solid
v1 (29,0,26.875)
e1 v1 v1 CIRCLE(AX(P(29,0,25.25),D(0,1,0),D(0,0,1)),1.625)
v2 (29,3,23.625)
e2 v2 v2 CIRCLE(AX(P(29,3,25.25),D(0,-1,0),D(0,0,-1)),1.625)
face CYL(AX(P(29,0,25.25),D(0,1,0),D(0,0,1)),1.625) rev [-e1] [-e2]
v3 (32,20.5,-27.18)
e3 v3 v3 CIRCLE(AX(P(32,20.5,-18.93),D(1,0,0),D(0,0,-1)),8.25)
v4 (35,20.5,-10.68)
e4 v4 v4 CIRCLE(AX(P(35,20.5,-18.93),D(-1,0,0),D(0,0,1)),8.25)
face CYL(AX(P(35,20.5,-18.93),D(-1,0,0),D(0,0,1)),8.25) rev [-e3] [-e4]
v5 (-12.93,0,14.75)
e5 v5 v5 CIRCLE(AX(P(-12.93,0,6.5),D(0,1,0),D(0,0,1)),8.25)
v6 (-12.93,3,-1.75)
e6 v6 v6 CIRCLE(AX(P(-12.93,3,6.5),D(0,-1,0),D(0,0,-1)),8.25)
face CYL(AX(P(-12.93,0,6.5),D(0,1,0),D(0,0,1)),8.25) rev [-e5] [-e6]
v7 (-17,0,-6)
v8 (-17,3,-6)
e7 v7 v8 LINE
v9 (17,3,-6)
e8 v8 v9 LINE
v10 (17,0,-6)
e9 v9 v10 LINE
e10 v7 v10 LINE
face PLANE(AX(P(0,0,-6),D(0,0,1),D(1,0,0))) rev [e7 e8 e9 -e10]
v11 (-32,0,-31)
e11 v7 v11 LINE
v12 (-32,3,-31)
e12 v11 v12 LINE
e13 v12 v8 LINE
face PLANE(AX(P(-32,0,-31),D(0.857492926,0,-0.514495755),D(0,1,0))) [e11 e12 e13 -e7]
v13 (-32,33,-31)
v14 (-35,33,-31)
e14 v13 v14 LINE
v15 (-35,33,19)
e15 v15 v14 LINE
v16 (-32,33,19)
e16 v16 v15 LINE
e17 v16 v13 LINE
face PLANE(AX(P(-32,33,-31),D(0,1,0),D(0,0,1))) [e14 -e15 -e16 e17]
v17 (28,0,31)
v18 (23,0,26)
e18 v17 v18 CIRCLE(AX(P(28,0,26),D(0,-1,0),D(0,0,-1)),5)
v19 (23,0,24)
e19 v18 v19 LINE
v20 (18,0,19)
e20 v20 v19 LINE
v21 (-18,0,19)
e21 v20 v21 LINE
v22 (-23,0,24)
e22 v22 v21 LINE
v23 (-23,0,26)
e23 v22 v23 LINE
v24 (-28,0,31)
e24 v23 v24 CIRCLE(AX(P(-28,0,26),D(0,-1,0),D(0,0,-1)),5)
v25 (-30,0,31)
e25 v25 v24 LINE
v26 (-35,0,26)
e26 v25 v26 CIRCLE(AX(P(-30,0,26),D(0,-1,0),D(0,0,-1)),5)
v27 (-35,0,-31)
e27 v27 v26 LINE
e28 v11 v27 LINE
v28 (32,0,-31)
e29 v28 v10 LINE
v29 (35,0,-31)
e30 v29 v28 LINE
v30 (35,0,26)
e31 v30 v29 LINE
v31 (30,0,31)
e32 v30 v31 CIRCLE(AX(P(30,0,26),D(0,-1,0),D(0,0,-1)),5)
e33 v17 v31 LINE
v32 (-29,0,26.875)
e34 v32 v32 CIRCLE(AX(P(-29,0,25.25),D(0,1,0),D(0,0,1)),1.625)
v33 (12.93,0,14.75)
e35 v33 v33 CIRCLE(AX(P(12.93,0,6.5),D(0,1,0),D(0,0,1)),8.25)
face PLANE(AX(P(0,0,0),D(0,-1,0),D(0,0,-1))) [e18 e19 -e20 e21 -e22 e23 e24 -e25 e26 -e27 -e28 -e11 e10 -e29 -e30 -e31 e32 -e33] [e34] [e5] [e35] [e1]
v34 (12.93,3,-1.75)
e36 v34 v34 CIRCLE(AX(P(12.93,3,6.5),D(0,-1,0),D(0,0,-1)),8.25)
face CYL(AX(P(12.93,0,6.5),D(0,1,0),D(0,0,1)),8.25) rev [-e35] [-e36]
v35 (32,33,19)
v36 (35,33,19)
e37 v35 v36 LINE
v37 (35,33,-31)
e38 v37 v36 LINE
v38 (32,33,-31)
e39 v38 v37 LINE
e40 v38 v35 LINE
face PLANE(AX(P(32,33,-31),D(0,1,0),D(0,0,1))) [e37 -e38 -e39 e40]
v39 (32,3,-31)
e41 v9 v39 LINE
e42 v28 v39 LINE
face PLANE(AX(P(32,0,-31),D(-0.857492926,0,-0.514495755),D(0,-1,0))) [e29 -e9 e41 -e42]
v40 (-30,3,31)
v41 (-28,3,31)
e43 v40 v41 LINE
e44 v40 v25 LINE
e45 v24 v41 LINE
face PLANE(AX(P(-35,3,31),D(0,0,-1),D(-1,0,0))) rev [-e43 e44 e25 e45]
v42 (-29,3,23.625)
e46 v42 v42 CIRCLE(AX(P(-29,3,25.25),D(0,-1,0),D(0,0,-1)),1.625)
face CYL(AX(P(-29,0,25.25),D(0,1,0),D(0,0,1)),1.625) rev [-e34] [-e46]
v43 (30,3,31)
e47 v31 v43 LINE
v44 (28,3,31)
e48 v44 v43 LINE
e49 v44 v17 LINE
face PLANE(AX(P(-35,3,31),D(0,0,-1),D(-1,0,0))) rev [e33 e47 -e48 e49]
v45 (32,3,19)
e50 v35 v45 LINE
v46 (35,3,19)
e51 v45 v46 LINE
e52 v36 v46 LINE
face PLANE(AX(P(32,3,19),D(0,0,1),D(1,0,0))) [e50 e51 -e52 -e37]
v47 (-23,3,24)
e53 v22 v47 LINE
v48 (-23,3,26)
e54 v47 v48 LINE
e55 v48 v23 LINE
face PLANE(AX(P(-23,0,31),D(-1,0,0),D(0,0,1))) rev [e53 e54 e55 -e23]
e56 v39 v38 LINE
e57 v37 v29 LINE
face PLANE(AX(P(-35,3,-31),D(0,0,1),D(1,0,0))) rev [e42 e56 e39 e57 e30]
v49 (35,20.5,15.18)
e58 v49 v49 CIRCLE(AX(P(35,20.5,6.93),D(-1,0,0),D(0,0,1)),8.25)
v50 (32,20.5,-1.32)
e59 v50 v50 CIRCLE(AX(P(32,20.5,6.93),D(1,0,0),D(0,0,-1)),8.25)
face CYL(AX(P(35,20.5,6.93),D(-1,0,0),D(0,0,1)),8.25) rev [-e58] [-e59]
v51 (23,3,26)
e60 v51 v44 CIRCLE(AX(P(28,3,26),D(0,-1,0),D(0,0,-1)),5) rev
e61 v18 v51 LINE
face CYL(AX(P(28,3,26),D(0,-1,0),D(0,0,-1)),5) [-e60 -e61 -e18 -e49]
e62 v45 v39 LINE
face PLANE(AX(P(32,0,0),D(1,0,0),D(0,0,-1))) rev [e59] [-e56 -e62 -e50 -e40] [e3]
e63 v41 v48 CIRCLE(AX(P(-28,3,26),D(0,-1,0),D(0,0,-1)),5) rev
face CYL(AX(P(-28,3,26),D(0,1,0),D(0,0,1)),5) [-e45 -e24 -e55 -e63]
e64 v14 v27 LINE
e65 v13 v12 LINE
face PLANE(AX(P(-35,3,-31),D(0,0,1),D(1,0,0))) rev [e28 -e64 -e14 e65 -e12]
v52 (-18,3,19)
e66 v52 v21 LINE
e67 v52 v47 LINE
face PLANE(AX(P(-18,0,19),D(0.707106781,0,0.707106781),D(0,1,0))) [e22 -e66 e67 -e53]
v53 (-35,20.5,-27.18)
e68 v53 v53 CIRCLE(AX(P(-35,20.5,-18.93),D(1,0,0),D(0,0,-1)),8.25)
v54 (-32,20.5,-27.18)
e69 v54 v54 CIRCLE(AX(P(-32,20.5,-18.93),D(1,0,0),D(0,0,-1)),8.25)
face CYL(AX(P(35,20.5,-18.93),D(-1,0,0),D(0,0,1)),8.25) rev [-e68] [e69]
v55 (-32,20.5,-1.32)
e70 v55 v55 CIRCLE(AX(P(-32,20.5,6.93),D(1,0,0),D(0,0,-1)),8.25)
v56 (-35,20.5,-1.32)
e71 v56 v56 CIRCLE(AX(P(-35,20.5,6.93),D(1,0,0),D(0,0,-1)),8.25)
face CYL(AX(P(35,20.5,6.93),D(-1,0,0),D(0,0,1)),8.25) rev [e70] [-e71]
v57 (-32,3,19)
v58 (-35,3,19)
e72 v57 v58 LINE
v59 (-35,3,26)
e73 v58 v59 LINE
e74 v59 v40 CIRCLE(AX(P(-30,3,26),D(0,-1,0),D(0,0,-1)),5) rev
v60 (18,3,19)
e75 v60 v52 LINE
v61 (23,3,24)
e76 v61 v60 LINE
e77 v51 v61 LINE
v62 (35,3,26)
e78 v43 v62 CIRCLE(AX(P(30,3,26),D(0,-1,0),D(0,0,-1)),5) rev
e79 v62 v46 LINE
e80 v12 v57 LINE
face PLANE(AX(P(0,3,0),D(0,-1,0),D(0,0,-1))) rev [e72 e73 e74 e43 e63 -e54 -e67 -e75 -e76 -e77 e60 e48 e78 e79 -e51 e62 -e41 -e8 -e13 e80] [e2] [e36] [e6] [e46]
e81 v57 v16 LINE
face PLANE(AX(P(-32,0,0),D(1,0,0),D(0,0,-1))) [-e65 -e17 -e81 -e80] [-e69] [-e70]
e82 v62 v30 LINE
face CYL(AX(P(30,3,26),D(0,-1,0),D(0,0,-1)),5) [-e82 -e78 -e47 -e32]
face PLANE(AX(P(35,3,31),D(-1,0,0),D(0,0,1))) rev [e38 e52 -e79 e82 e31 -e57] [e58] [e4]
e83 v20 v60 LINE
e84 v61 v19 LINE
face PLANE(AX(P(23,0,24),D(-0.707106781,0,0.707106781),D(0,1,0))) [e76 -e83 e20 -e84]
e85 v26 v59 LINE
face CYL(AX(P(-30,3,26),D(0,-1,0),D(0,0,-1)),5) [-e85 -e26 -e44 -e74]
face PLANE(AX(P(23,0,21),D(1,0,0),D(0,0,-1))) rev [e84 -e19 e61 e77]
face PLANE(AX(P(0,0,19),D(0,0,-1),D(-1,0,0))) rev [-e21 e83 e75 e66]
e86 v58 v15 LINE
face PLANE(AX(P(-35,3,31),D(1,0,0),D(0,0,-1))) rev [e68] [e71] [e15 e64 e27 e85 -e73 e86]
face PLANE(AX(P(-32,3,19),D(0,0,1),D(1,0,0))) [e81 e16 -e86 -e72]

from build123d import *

# Parameters (mm, degrees)
CROQUIS1_W                 = 70
CROQUIS1_H                 = 62
SALIENTE_EXTRUIR1_DEPTH    = 3
CORTAR_EXTRUIR1_DEPTH      = 47.8508271
CORTAR_EXTRUIR2_DEPTH      = 47.8508271
CROQUIS4_W                 = 46
CROQUIS4_H                 = 10
CORTAR_EXTRUIR3_DEPTH      = 47.8508271
CROQUIS5_W                 = 46
CROQUIS5_H                 = 2
CORTAR_EXTRUIR4_DEPTH      = 47.8508271
CORTAR_EXTRUIR5_DEPTH      = 47.8508271
CORTAR_EXTRUIR5_DEPTH_BACK = 47.8508271
CROQUIS6_R                 = 1.625
CHAFL_N1_START             = -4
CHAFL_N1_OUTLINE_W         = 7.071067812
CHAFL_N1_OUTLINE_H         = 3
CHAFL_N1_DEPTH             = 4.707106781
CHAFL_N2_START             = -0.707106781
CHAFL_N2_OUTLINE_W         = 7.071067812
CHAFL_N2_OUTLINE_H         = 3
CHAFL_N2_DEPTH             = 4.707106781
CORTAR_EXTRUIR6_DEPTH      = 47.8508271
CORTAR_EXTRUIR6_DEPTH_BACK = 47.8508271
CROQUIS7_R                 = 8.25
SALIENTE_EXTRUIR2_DEPTH    = 3
CORTAR_EXTRUIR7_DEPTH      = 69.23672032
CORTAR_EXTRUIR7_DEPTH_BACK = 69.23672032
CORTAR_EXTRUIR8_DEPTH      = 47.8508271
CHAFL_N3_DEPTH             = 3
CHAFL_N5_DEPTH             = 3
CROQUIS13_W                = 50
CROQUIS13_H                = 30
SALIENTE_EXTRUIR3_DEPTH    = 3
CROQUIS14_W                = 50
CROQUIS14_H                = 30
SALIENTE_EXTRUIR4_DEPTH    = 3
REDONDEO1_R                = 5
CORTAR_EXTRUIR9_DEPTH      = 84.366660003
CORTAR_EXTRUIR9_DEPTH_BACK = 84.366660003
CROQUIS16_R                = 8.25


with BuildPart() as part:
    # Croquis1 → Saliente-Extruir1 (new body)
    with BuildSketch(Plane(origin=(0, 0, 0), x_dir=(1, 0, 0), z_dir=(0, 1, 0))):
        Rectangle(CROQUIS1_W, CROQUIS1_H)
    extrude(amount=SALIENTE_EXTRUIR1_DEPTH)

    # Croquis2 → Cortar-Extruir1 (cut, through all)
    with BuildSketch(Plane(origin=(0, 3, 0), x_dir=(1, 0, 0), z_dir=(0, 1, 0))):
        Polygon((31.754264805, 31), (15.877132403, 58.5), (-15.877132403, 58.5), (-31.754264805, 31), (-15.877132403, 3.5), (15.877132403, 3.5), align=None)
    extrude(amount=-CORTAR_EXTRUIR1_DEPTH, mode=Mode.SUBTRACT)

    # Croquis3 → Cortar-Extruir2 (cut, through all)
    with BuildSketch(Plane(origin=(0, 3, 0), x_dir=(1, 0, 0), z_dir=(0, 1, 0))):
        with BuildLine():
            Line((-13, -21), (13, -21))
            ThreePointArc((13, -21), (23, -31), (13, -41))
            Line((13, -41), (-13, -41))
            ThreePointArc((-13, -41), (-23, -31), (-13, -21))
        make_face()
    extrude(amount=-CORTAR_EXTRUIR2_DEPTH, mode=Mode.SUBTRACT)

    # Croquis4 → Cortar-Extruir3 (cut, through all)
    with BuildSketch(Plane(origin=(0, 3, 0), x_dir=(1, 0, 0), z_dir=(0, 1, 0))):
        with Locations((0, -26)):
            Rectangle(CROQUIS4_W, CROQUIS4_H)
    extrude(amount=-CORTAR_EXTRUIR3_DEPTH, mode=Mode.SUBTRACT)

    # Croquis5 → Cortar-Extruir4 (cut, through all)
    with BuildSketch(Plane(origin=(0, 3, 0), x_dir=(1, 0, 0), z_dir=(0, 1, 0))):
        with Locations((0, -20)):
            Rectangle(CROQUIS5_W, CROQUIS5_H)
    extrude(amount=-CORTAR_EXTRUIR4_DEPTH, mode=Mode.SUBTRACT)

    # Croquis6 → Cortar-Extruir5 (cut, two sides: drawn at the far end of the back side and taken through both)
    with BuildSketch(Plane(origin=(0, 3, 0), x_dir=(1, 0, 0), z_dir=(0, 1, 0)).offset(-CORTAR_EXTRUIR5_DEPTH_BACK)):
        with Locations(Location((-29, -25.25, 0), (0, 0, 270))):
            Circle(CROQUIS6_R)
        with Locations(Location((29, -25.25, 0), (0, 0, 270))):
            Circle(CROQUIS6_R)
    extrude(amount=CORTAR_EXTRUIR5_DEPTH + CORTAR_EXTRUIR5_DEPTH_BACK, mode=Mode.SUBTRACT)

    # Chaflán1: read off the stored shape, not the designer's step
    # Chaflán1 outline → Chaflán1 (add)
    with BuildSketch(Plane(origin=(0, 0, 0), x_dir=(0.7071067811865471, 0, -0.707106781186548), z_dir=(0.707106781186548, 0, 0.707106781186547)).offset(CHAFL_N1_START)):
        with Locations((-29.69848481, 1.5)):
            Rectangle(CHAFL_N1_OUTLINE_W, CHAFL_N1_OUTLINE_H)
    extrude(amount=CHAFL_N1_DEPTH)

    # Chaflán2: read off the stored shape, not the designer's step
    # Chaflán2 outline → Chaflán2 (add)
    with BuildSketch(Plane(origin=(0, 0, 0), x_dir=(0.707106781186548, 0, 0.707106781186547), z_dir=(0.707106781186547, 0, -0.707106781186548)).offset(CHAFL_N2_START)):
        with Locations((29.69848481, -1.5)):
            Rectangle(CHAFL_N2_OUTLINE_W, CHAFL_N2_OUTLINE_H)
    extrude(amount=CHAFL_N2_DEPTH)

    # Croquis7 → Cortar-Extruir6 (cut, two sides: drawn at the far end of the back side and taken through both)
    with BuildSketch(Plane(origin=(0, 3, 0), x_dir=(1, 0, 0), z_dir=(0, 1, 0)).offset(-CORTAR_EXTRUIR6_DEPTH_BACK)):
        with Locations(Location((-12.93, -6.5, 0), (0, 0, 270))):
            Circle(CROQUIS7_R)
        with Locations(Location((12.93, -6.5, 0), (0, 0, 270))):
            Circle(CROQUIS7_R)
    extrude(amount=CORTAR_EXTRUIR6_DEPTH + CORTAR_EXTRUIR6_DEPTH_BACK, mode=Mode.SUBTRACT)

    # Croquis8 → Saliente-Extruir2 (add)
    with BuildSketch(Plane(origin=(0, 3, 0), x_dir=(1, 0, 0), z_dir=(0, 1, 0))):
        Polygon((15.877132403, 3.5), (31.754264805, 31), (15.877132403, 58.5), (-15.877132403, 58.5), (-31.754264805, 31), (-15.877132403, 3.5), (0, 3.5), align=None)
    extrude(amount=-SALIENTE_EXTRUIR2_DEPTH)

    # Croquis9 → Cortar-Extruir7 (cut, two sides: drawn at the far end of the back side and taken through both)
    with BuildSketch(Plane(origin=(0, 3, 0), x_dir=(1, 0, 0), z_dir=(0, 1, 0)).offset(-CORTAR_EXTRUIR7_DEPTH_BACK)):
        Polygon((-232.018715641, 31), (-35, 31), (35, 31), (232.018715641, 31), (232.018715641, 425.037431282), (-232.018715641, 425.037431282), align=None)
    extrude(amount=CORTAR_EXTRUIR7_DEPTH + CORTAR_EXTRUIR7_DEPTH_BACK, mode=Mode.SUBTRACT)

    # Croquis10 → Cortar-Extruir8 (cut, through all)
    with BuildSketch(Plane(origin=(0, 3, 0), x_dir=(1, 0, 0), z_dir=(0, 1, 0))):
        Polygon((0, 6), (-32, 6), (-32, 31), (32, 31), (32, 6), align=None)
    extrude(amount=-CORTAR_EXTRUIR8_DEPTH, mode=Mode.SUBTRACT)

    # Chaflán3: read off the stored shape, not the designer's step
    # Chaflán3 outline → Chaflán3 (add)
    with BuildSketch(Plane(origin=(0, 0, 0), x_dir=(1, 0, 0), z_dir=(0, 1, 0))):
        Polygon((-32, 6), (-17, 6), (-32, 31), align=None)
    extrude(amount=CHAFL_N3_DEPTH)

    # Chaflán5: read off the stored shape, not the designer's step
    # Chaflán5 outline → Chaflán5 (add)
    with BuildSketch(Plane(origin=(0, 0, 0), x_dir=(1, 0, 0), z_dir=(0, 1, 0))):
        Polygon((32, 6), (32, 31), (17, 6), align=None)
    extrude(amount=CHAFL_N5_DEPTH)

    # Croquis13 → Saliente-Extruir3 (add)
    with BuildSketch(Plane.ZY.offset(35)):
        with Locations((-6, 18)):
            Rectangle(CROQUIS13_W, CROQUIS13_H)
    extrude(amount=-SALIENTE_EXTRUIR3_DEPTH)

    # Croquis14 → Saliente-Extruir4 (add)
    with BuildSketch(Plane(origin=(35, 0, 0), x_dir=(0, 0, -1), z_dir=(1, 0, 0))):
        with Locations((6, 18)):
            Rectangle(CROQUIS14_W, CROQUIS14_H)
    extrude(amount=-SALIENTE_EXTRUIR4_DEPTH)

    # Redondeo1
    redondeo1_edges = [part.edges().sort_by_distance(p)[0] for p in [
        (-23, 1.5, 31),
        (23, 1.5, 31),
        (35, 1.5, 31),
        (-35, 1.5, 31),
    ]]
    fillet(redondeo1_edges, radius=REDONDEO1_R)

    # Croquis16 → Cortar-Extruir9 (cut, two sides: drawn at the far end of the back side and taken through both)
    with BuildSketch(Plane.ZY.offset(35).offset(-CORTAR_EXTRUIR9_DEPTH_BACK)):
        with Locations((-18.93, 20.5)):
            Circle(CROQUIS16_R)
        with Locations((6.93, 20.5)):
            Circle(CROQUIS16_R)
    extrude(amount=CORTAR_EXTRUIR9_DEPTH + CORTAR_EXTRUIR9_DEPTH_BACK, mode=Mode.SUBTRACT)


solid = part.part
